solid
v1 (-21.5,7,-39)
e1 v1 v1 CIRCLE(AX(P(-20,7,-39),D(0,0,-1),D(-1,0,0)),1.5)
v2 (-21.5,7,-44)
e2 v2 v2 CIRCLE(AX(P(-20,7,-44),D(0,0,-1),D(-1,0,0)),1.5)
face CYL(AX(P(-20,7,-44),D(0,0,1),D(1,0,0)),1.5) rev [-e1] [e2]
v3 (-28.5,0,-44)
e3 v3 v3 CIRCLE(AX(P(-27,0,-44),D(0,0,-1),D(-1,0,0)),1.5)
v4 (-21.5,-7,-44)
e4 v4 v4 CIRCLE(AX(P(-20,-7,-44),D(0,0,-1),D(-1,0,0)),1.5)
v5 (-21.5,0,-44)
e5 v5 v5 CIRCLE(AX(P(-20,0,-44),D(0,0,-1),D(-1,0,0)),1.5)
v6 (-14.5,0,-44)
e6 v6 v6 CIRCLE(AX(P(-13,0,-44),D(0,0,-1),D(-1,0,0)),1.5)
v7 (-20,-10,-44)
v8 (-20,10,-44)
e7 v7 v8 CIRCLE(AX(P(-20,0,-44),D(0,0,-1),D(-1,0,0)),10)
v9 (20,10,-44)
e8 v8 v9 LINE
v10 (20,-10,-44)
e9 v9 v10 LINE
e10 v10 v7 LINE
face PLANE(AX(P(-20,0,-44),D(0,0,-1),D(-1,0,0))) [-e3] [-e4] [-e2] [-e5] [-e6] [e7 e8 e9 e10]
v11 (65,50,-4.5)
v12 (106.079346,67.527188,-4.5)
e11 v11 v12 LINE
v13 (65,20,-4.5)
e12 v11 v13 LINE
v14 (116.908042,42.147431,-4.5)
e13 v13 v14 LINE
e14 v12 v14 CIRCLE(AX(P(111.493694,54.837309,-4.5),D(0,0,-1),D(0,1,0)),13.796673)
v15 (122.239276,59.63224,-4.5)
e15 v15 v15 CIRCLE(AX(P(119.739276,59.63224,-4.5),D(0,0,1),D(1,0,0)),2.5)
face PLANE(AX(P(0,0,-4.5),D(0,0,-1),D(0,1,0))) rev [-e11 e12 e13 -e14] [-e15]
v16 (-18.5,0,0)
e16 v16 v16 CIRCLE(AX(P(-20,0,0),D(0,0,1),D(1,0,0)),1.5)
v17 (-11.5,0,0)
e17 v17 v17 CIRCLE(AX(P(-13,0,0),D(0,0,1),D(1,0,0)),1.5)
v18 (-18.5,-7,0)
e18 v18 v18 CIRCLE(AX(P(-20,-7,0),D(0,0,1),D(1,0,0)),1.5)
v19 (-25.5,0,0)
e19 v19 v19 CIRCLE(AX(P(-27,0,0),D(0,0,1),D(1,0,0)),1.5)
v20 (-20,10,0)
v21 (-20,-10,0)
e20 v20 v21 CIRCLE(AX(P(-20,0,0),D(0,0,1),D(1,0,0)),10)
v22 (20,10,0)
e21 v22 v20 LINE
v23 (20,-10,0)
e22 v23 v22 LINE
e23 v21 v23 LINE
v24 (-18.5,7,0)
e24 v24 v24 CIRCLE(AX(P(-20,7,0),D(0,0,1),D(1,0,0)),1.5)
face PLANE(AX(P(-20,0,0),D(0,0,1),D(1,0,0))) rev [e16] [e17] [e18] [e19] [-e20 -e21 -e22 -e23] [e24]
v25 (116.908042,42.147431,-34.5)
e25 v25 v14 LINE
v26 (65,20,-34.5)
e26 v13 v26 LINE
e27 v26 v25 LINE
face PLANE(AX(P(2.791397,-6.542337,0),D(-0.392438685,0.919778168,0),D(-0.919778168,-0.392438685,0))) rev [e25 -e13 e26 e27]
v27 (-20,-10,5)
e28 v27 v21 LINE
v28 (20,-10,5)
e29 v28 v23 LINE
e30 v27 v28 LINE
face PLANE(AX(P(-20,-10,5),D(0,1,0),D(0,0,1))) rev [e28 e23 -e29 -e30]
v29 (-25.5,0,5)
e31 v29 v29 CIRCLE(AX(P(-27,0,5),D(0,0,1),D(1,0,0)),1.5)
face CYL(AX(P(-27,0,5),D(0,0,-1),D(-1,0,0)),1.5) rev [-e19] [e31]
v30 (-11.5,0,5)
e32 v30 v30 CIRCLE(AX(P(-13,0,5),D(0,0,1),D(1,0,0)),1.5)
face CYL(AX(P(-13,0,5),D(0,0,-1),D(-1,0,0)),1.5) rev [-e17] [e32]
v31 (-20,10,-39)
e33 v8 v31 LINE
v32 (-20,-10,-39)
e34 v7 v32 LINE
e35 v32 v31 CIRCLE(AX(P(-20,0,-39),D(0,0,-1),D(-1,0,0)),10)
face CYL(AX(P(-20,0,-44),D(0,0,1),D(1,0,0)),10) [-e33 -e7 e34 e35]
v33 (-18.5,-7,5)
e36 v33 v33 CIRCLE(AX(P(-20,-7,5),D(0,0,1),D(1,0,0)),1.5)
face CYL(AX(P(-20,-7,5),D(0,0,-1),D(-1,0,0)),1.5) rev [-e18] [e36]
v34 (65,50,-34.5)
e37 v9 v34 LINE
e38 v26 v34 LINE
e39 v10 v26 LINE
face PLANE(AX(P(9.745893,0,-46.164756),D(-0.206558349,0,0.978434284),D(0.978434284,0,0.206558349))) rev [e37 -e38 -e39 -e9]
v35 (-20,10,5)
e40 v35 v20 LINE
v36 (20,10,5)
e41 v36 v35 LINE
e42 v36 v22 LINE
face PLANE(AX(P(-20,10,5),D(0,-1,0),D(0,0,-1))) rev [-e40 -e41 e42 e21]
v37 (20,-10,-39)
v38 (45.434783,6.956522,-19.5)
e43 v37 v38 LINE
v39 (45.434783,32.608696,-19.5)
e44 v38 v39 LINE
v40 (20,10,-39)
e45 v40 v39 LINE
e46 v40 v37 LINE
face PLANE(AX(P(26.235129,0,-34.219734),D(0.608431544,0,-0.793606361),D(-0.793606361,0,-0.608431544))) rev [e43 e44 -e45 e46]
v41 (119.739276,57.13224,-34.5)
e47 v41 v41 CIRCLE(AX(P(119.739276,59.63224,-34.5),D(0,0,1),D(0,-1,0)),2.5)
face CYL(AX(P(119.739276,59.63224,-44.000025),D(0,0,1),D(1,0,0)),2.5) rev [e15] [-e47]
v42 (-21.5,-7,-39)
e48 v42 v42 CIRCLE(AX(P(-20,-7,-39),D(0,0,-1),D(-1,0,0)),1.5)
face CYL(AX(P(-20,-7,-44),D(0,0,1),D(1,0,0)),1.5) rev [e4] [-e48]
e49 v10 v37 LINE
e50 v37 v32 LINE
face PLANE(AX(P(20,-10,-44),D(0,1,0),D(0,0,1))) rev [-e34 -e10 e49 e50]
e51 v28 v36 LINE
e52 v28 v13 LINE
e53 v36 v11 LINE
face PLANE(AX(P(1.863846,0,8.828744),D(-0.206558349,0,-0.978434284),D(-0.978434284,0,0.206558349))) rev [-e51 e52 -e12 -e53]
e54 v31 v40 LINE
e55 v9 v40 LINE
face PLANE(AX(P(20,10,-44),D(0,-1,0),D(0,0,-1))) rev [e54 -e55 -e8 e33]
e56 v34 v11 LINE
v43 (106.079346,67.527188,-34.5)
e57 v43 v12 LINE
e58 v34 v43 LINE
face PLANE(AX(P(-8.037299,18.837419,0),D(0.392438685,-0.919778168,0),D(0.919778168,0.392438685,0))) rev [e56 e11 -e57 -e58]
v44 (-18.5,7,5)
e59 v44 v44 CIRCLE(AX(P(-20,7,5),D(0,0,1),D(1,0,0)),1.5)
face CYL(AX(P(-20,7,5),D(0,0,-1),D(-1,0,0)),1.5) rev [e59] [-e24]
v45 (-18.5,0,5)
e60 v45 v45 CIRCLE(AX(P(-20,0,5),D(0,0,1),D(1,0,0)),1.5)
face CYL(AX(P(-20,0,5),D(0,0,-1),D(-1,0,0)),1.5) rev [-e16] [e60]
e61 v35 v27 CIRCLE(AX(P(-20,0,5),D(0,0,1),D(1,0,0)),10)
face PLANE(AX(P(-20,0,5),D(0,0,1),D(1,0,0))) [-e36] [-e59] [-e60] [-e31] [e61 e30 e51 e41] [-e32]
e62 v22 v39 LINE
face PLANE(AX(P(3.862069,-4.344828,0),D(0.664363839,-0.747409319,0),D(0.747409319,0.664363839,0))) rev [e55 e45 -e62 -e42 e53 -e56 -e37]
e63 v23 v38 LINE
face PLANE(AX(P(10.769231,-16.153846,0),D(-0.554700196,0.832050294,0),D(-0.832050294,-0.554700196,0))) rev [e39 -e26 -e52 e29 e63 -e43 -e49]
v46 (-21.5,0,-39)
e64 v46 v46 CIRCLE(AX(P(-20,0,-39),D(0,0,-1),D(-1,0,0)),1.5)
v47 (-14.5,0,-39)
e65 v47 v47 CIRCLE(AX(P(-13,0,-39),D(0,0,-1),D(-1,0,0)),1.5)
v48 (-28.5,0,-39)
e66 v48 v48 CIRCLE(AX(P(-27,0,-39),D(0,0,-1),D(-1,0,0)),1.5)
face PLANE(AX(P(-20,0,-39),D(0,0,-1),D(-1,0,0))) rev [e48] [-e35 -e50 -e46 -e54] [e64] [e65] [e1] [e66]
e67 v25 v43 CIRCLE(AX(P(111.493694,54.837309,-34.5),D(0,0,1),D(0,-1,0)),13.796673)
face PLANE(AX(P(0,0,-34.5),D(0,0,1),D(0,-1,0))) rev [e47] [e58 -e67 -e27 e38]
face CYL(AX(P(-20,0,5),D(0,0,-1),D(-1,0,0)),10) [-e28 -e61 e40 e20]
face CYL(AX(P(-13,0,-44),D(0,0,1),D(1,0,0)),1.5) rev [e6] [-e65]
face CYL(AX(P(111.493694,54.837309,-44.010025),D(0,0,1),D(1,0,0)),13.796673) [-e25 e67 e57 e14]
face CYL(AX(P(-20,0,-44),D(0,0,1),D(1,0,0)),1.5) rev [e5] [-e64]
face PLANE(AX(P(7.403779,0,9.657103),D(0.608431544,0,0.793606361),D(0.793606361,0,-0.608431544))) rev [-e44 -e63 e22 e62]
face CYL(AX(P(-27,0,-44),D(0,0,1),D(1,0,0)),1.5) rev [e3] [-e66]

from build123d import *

# Parameters (mm, degrees)
SKETCH1_R           = 1.5
BOSS_EXTRUDE1_DEPTH = 5
SKETCH2_R           = 1.5
BOSS_EXTRUDE2_DEPTH = 5
SPLIT6_START        = -34.5
SPLIT6_DEPTH        = 30
SKETCH24_R          = 2.5
CUT_EXTRUDE3_DEPTH  = 149.21791213


# Read off the part's stored shape, not the designer's step: Split6
with BuildPart() as part:
    # Sketch1 → Boss-Extrude1 (new body)
    with BuildSketch(Plane.XY):
        with BuildLine():
            Line((-20, 10), (20, 10))
            Line((20, 10), (20, -10))
            Line((20, -10), (-20, -10))
            ThreePointArc((-20, -10), (-30, 0), (-20, 10))
        make_face()
        with Locations((-20, 0)):
            Circle(SKETCH1_R, mode=Mode.SUBTRACT)
        with Locations((-20, -7)):
            Circle(SKETCH1_R, mode=Mode.SUBTRACT)
        with Locations((-27, 0)):
            Circle(SKETCH1_R, mode=Mode.SUBTRACT)
        with Locations((-20, 7)):
            Circle(SKETCH1_R, mode=Mode.SUBTRACT)
        with Locations((-13, 0)):
            Circle(SKETCH1_R, mode=Mode.SUBTRACT)
    extrude(amount=BOSS_EXTRUDE1_DEPTH)



with BuildPart() as body_2:
    # Sketch2 → Boss-Extrude2 (new body)
    with BuildSketch(Plane(origin=(0, 0, -39), x_dir=(-1, 0, 0), z_dir=(0, 0, -1))):
        with BuildLine():
            Line((-20, 10), (20, 10))
            ThreePointArc((20, 10), (30, 0), (20, -10))
            Line((20, -10), (-20, -10))
            Line((-20, -10), (-20, 10))
        make_face()
        with Locations(Location((20, 0, 0), (0, 0, 180))):
            Circle(SKETCH2_R, mode=Mode.SUBTRACT)
        with Locations(Location((13, 0, 0), (0, 0, 180))):
            Circle(SKETCH2_R, mode=Mode.SUBTRACT)
        with Locations(Location((20, 7, 0), (0, 0, 180))):
            Circle(SKETCH2_R, mode=Mode.SUBTRACT)
        with Locations(Location((27, 0, 0), (0, 0, 180))):
            Circle(SKETCH2_R, mode=Mode.SUBTRACT)
        with Locations(Location((20, -7, 0), (0, 0, 180))):
            Circle(SKETCH2_R, mode=Mode.SUBTRACT)
    extrude(amount=BOSS_EXTRUDE2_DEPTH)

    # Sketch12 → section 1 of loft1
    with BuildSketch(Plane(origin=(65, 0, 0), x_dir=(0, 0, -1), z_dir=(1, 0, 0)), mode=Mode.PRIVATE) as loft1_s1:
        with BuildLine():
            Line((4.5, 50), (34.5, 50))
            Line((34.5, 50), (34.5, 20))
            Line((34.5, 20), (4.5, 20))
            Line((4.5, 20), (4.5, 50))
        make_face()
    # loft from a face of the part (loft1)
    loft([body_2.faces().sort_by_distance((20, 0, -41.5))[0], loft1_s1.sketch])


with BuildPart() as part_1:
    add(part.part)

    add(body_2.part)  # loft2 joins it to this body
    # loft from a face of the part (loft2)
    loft([part_1.faces().sort_by_distance((20, 0, 2.5))[0], part_1.faces().sort_by_distance((65, 35, -19.5))[0]])

    # Sketch18 → section 1 of loft3
    with BuildSketch(Plane(origin=(140, 0, 0), x_dir=(0, 0, -1), z_dir=(1, 0, 0)), mode=Mode.PRIVATE) as loft3_s1:
        with BuildLine():
            Line((4.5, 82), (34.5, 82))
            Line((34.5, 82), (34.5, 52))
            Line((34.5, 52), (4.5, 52))
            Line((4.5, 52), (4.5, 82))
        make_face()
    # loft from a face of the part (loft3)
    loft([part_1.faces().sort_by_distance((65, 35, -19.5))[0], loft3_s1.sketch])

    # Split6 outline → Split6 (cut)
    with BuildSketch(Plane.XY.offset(SPLIT6_START)):
        with BuildLine():
            ThreePointArc((106.079345998, 67.527187626), (124.183572198, 60.251657472), (116.908042043, 42.147431272))
            Line((116.908042043, 42.147431272), (140, 52))
            Line((140, 52), (140, 82))
            Line((140, 82), (106.079345998, 67.527187626))
        make_face()
    extrude(amount=SPLIT6_DEPTH, mode=Mode.SUBTRACT)

    # Sketch24 → Cut-Extrude3 (cut, through all)
    with BuildSketch(Plane.XY.offset(-4.5)):
        with Locations((119.739276472, 59.632240301)):
            Circle(SKETCH24_R)
    extrude(amount=-CUT_EXTRUDE3_DEPTH, mode=Mode.SUBTRACT)


solid = part_1.part
